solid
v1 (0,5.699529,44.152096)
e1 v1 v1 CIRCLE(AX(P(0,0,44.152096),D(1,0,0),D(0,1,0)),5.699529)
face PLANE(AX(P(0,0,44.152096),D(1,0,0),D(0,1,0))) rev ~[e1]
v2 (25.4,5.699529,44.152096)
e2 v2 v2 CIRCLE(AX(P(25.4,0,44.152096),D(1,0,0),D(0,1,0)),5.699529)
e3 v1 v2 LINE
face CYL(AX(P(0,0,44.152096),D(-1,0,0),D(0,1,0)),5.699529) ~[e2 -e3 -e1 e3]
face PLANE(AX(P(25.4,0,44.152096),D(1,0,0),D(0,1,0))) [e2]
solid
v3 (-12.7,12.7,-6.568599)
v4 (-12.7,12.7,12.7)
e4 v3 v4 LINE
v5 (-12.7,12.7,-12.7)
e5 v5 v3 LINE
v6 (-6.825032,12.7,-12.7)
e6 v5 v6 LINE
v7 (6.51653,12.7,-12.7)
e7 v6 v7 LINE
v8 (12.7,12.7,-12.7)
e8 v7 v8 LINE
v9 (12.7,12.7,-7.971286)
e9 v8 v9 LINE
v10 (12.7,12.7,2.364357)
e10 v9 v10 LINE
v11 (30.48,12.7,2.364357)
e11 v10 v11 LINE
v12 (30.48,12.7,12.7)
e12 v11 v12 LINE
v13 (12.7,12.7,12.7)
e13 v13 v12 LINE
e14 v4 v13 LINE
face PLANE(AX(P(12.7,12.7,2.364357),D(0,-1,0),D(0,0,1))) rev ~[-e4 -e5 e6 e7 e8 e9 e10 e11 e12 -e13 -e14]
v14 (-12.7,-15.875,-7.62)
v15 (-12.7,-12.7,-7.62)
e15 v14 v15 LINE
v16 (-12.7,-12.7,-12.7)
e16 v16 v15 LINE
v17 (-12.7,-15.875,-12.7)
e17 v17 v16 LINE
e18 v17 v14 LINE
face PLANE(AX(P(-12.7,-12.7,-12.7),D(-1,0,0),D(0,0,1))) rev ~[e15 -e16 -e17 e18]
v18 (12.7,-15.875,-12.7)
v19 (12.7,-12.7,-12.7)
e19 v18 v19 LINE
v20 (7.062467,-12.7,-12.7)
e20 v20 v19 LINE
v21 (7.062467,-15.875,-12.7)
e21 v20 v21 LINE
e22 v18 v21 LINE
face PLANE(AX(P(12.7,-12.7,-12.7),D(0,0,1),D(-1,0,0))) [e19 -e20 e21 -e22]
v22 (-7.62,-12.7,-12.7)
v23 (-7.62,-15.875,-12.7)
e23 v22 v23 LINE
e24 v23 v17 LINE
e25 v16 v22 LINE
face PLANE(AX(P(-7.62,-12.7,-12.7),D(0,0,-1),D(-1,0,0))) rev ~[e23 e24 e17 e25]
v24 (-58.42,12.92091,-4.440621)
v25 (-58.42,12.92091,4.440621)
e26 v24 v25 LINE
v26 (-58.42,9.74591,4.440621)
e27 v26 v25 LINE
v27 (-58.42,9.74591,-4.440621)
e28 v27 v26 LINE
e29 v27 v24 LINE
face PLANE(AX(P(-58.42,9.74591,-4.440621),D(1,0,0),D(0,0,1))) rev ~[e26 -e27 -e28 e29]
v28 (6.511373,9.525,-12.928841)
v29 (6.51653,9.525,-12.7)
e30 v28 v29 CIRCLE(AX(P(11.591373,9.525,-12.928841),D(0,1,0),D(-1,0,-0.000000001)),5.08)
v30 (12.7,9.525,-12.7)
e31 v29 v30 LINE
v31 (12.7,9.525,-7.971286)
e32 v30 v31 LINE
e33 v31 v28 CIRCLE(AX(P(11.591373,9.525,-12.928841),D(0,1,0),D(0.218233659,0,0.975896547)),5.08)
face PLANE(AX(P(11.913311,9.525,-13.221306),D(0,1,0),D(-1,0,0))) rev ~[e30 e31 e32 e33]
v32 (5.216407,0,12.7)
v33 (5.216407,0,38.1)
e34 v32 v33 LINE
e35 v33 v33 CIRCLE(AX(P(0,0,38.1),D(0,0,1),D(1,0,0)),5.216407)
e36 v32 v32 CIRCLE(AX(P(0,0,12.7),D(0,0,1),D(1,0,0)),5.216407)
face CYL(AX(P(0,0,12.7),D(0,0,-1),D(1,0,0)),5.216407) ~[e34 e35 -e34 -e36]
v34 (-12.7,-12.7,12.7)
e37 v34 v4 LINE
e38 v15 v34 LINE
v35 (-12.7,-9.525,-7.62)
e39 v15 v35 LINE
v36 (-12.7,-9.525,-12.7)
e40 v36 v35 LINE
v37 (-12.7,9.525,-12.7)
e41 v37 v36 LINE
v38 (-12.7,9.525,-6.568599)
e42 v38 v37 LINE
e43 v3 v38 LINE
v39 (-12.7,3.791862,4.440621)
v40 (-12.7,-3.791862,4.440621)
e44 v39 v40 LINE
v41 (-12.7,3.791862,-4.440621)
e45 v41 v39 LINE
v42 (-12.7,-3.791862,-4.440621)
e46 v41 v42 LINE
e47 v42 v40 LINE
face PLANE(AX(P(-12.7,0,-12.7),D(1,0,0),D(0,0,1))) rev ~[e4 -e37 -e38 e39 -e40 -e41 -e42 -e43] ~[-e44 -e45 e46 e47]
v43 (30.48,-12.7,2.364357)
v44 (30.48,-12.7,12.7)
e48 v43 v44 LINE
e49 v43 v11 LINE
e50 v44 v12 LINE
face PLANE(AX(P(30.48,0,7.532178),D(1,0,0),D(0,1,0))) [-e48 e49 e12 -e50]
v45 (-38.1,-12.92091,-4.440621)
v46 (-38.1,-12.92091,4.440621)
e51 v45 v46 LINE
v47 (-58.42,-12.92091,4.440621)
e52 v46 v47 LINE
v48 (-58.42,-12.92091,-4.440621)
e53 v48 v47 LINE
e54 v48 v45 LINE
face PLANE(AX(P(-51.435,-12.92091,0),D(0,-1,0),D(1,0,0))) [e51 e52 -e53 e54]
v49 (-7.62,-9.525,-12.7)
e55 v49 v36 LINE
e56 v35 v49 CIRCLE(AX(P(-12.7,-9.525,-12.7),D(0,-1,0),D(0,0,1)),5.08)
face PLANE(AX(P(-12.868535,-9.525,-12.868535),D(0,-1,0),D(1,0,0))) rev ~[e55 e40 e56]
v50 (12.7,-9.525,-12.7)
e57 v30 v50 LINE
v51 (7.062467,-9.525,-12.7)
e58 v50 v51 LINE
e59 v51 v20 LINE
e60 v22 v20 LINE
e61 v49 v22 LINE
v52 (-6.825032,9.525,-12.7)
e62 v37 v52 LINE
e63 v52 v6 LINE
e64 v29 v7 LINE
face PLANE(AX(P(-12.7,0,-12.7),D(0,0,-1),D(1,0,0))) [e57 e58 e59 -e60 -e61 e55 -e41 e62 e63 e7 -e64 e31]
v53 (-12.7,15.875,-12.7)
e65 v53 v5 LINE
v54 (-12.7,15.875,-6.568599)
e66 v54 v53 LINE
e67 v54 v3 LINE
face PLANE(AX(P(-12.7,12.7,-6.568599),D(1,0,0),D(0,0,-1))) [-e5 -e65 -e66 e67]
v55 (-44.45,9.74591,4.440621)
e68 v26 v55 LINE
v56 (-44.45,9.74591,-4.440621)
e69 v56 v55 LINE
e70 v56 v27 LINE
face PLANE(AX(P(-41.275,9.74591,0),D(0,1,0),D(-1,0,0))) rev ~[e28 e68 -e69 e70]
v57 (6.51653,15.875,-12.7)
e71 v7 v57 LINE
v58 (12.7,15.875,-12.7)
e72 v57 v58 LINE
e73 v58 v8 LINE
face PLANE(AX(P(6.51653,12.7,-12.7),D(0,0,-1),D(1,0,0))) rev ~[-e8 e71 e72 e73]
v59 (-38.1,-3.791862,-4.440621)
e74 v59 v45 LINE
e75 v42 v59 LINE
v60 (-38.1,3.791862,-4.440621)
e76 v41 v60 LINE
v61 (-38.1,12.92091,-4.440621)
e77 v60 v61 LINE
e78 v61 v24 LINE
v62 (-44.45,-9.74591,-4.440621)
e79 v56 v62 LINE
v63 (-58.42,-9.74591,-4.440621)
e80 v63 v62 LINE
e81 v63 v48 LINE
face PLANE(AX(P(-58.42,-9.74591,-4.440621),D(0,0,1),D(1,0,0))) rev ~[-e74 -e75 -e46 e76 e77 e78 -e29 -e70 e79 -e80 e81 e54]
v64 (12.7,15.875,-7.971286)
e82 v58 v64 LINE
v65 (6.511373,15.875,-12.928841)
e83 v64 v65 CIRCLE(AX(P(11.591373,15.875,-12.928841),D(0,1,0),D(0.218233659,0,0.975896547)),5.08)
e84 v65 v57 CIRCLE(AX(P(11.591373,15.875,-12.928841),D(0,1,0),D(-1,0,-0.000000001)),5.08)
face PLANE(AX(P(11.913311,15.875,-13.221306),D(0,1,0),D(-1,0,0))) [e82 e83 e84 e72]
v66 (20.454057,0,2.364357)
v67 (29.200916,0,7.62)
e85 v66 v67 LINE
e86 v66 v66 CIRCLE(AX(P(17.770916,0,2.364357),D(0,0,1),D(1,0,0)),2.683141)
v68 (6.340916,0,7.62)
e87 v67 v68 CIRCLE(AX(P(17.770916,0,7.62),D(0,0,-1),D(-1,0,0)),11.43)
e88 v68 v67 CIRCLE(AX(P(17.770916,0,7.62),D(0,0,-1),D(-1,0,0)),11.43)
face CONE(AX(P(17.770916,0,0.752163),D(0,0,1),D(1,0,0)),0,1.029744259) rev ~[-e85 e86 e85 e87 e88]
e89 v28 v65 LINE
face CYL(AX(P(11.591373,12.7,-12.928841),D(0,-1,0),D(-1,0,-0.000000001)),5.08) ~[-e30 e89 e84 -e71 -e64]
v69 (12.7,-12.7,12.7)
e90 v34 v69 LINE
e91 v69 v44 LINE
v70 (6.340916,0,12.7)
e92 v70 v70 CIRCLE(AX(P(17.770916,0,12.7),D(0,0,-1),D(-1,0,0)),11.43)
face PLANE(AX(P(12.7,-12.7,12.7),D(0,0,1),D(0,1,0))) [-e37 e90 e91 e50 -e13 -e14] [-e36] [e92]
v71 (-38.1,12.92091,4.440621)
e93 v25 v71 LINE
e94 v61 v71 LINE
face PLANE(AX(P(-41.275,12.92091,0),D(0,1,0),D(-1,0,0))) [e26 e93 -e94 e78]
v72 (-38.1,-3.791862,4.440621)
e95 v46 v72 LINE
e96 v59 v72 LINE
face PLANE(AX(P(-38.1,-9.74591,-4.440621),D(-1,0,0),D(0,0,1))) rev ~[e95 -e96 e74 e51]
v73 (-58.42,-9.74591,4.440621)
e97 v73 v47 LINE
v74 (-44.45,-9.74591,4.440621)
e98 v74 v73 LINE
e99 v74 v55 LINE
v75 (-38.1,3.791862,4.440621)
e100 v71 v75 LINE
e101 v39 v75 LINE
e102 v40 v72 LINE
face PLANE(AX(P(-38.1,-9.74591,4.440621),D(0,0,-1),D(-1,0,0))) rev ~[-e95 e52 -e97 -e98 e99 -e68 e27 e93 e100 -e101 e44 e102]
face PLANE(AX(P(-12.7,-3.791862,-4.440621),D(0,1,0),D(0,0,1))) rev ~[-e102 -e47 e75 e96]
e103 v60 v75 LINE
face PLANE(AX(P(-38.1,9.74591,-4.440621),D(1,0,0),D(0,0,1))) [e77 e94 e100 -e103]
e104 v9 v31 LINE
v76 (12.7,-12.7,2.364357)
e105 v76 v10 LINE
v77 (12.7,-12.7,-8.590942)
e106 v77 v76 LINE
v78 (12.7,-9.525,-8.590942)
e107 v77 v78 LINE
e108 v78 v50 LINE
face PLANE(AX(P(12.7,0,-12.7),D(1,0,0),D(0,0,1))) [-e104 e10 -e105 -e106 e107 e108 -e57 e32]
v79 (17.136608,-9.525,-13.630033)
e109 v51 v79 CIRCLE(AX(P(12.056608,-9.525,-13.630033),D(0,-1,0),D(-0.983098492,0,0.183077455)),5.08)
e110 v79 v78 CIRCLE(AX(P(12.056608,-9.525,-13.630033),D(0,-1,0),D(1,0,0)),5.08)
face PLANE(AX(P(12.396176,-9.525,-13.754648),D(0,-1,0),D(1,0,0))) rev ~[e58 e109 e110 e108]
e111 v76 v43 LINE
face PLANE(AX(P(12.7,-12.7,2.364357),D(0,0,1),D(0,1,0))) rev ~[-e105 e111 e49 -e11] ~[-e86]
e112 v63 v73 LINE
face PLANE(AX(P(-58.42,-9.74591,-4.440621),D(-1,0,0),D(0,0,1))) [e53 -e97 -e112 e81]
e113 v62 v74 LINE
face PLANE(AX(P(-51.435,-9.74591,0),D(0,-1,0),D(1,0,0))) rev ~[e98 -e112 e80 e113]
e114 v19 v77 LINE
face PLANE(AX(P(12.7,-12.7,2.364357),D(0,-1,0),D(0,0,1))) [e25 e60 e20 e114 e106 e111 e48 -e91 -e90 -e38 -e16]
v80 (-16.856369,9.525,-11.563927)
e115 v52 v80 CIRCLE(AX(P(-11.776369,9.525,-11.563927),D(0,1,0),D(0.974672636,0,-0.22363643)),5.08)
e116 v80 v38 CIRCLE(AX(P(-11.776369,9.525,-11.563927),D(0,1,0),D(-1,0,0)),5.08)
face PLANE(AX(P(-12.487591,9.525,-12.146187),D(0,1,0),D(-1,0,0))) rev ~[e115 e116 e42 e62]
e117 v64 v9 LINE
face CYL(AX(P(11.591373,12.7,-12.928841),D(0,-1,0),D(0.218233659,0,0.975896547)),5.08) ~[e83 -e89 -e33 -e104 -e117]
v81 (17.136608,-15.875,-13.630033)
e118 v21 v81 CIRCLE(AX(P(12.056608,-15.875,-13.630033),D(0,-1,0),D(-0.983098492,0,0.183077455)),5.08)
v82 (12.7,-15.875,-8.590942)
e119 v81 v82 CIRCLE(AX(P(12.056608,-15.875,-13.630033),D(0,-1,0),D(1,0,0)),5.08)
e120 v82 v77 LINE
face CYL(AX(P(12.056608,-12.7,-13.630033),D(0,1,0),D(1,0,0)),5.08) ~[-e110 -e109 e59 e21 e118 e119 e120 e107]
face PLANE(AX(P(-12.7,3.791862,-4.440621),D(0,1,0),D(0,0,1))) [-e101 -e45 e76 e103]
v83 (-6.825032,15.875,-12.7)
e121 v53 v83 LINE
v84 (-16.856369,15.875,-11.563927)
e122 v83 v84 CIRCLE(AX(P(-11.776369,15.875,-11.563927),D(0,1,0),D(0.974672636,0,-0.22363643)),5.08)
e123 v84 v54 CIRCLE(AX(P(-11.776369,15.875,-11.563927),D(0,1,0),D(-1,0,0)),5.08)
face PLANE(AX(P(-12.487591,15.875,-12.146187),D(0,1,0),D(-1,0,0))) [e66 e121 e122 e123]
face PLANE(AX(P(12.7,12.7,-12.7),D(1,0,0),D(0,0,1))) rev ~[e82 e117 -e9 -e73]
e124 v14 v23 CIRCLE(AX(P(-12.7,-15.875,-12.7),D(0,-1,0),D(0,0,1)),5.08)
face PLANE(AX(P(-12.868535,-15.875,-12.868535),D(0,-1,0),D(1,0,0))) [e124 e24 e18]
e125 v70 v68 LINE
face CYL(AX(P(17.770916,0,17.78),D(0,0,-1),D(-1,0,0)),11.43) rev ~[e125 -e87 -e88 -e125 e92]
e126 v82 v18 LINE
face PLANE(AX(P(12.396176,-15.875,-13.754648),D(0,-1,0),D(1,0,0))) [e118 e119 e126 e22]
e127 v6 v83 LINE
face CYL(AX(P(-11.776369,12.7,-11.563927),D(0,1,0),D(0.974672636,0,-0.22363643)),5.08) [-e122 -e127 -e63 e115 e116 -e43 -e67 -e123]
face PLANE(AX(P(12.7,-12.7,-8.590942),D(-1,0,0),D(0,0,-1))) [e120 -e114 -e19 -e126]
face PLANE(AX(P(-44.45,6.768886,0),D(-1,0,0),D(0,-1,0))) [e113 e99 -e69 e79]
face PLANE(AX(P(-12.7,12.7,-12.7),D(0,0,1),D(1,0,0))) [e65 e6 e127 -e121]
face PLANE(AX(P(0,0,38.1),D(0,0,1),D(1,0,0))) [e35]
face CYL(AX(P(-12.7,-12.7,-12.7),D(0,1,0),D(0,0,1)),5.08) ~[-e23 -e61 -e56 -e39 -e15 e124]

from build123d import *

# Parameters (mm, degrees)
F0_W      = 25.4
F0_H      = 25.4
F1_DEPTH  = 12.7
F3_DEPTH  = 3.175
F5_DEPTH  = 3.175
F6_R      = 5.2164072596
F7_DEPTH  = 25.4
F8_R      = 5.6995289673
F9_DEPTH  = 25.4
F12_W     = 7.5837243348
F12_H     = 8.8812420145
F13_DEPTH = 25.4
F14_W     = 5.954047665
F14_H     = 8.8812420145
F14_W_2   = 7.5837243348
F15_DEPTH = 6.35
F16_W     = 6.35
F16_H     = 8.8812420145
F16_W_2   = 13.97
F17_DEPTH = 3.175
F18_W     = 13.97
F18_H     = 8.8812420145
F18_W_2   = 6.35
F19_DEPTH = 3.175
F20_W     = 25.4
F20_H     = 10.3356431233
F21_DEPTH = 17.78
F23_D     = 22.86
F23_DEPTH = 5.08
F23_TIP   = 6.8678368755


# Not quite as in the source:
# - the program builds the solid bodies; features that only make, move or delete a surface that nothing else refers to are left out


with BuildPart() as f1:
    # F0 (on Front) → F1 (new body, symmetric)
    with BuildSketch(Plane.XZ):
        Rectangle(F0_W, F0_H)
    extrude(amount=F1_DEPTH, both=True)

    # F2 (on face) → F3 (join, symmetric)
    with BuildSketch(Plane.XZ.offset(12.7)):
        with BuildLine():
            ThreePointArc((-12.7, -7.62), (-16.2921024484, -16.2921024484), (-7.62, -12.7))
            Line((-7.62, -12.7), (-12.7, -12.7))
            Line((-12.7, -12.7), (-12.7, -7.62))
        make_face()
        with BuildLine():
            Line((12.7, -12.7), (7.0624674123, -12.7))
            ThreePointArc((7.0624674123, -12.7), (11.5896136049, -18.6885230146), (17.136607753, -13.6300334707))
            ThreePointArc((17.136607753, -13.6300334707), (15.8694041425, -10.2731027754), (12.7, -8.5909416461))
            Line((12.7, -8.5909416461), (12.7, -12.7))
        make_face()
    extrude(amount=F3_DEPTH, both=True)

    # F4 (on face) → F5 (join, symmetric)
    with BuildSketch(Plane(origin=(0, 12.7, 0), x_dir=(-1, 0, 0), z_dir=(0, 1, 0))):
        with BuildLine():
            ThreePointArc((-12.7, -7.9712862466), (-14.7674220428, -16.8935743083), (-6.5113730115, -12.9288407043))
            ThreePointArc((-6.5113730115, -12.9288407043), (-6.5126624138, -12.8143913027), (-6.5165299664, -12.7))
            Line((-6.5165299664, -12.7), (-12.7, -12.7))
            Line((-12.7, -12.7), (-12.7, -7.9712862466))
        make_face()
        with BuildLine():
            Line((12.7, -12.7), (6.8250320748, -12.7))
            ThreePointArc((6.8250320748, -12.7), (12.3480368398, -16.6116586986), (16.856369065, -11.5639269352))
            ThreePointArc((16.856369065, -11.5639269352), (15.6813943626, -8.314745896), (12.7, -6.568598528))
            Line((12.7, -6.568598528), (12.7, -12.7))
        make_face()
    extrude(amount=F5_DEPTH, both=True)

    # F6 (on face) → F7 (join)
    with BuildSketch(Plane.XY.offset(12.7)):
        Circle(F6_R)
    extrude(amount=F7_DEPTH)

    # F12 (on face) → F13 (join)
    with BuildSketch(Plane(origin=(-12.7, 0, 0), x_dir=(0, -1, 0), z_dir=(-1, 0, 0))):
        Rectangle(F12_W, F12_H)
    extrude(amount=F13_DEPTH)

    # F14 (on face) → F15 (join)
    with BuildSketch(Plane(origin=(-38.1, 0, 0), x_dir=(0, -1, 0), z_dir=(-1, 0, 0))):
        with Locations((-6.7688859999, 0)):
            Rectangle(F14_W, F14_H)
        Rectangle(F14_W_2, F14_H)
        with Locations((6.7688859999, 0)):
            Rectangle(F14_W, F14_H)
    extrude(amount=F15_DEPTH)

    # F16 (on face) → F17 (join)
    with BuildSketch(Plane(origin=(0, 9.7459098324, 0), x_dir=(-1, 0, 0), z_dir=(0, 1, 0))):
        with Locations((41.275, 0)):
            Rectangle(F16_W, F16_H)
        with Locations((51.435, 0)):
            Rectangle(F16_W_2, F16_H)
    extrude(amount=F17_DEPTH)

    # F18 (on face) → F19 (join)
    with BuildSketch(Plane.XZ.offset(9.7459098324)):
        with Locations((-51.435, 0)):
            Rectangle(F18_W, F18_H)
        with Locations((-41.275, 0)):
            Rectangle(F18_W_2, F18_H)
    extrude(amount=F19_DEPTH)

    # F20 (on face) → F21 (join)
    with BuildSketch(Plane.YZ.offset(12.7)):
        with Locations((0, 7.5321784383)):
            Rectangle(F20_W, F20_H)
    extrude(amount=F21_DEPTH)

    # F23
    with Locations(Plane.XY.offset(12.7)):
        with Locations((17.7709162235, 0)):
            Hole(F23_D / 2, depth=F23_DEPTH)
            with Locations((0, 0, -(F23_DEPTH + F23_TIP / 2))):  # 118° drill point
                Cone(0, F23_D / 2, F23_TIP, mode=Mode.SUBTRACT)


with BuildPart() as f9:
    # F8 (on Right) → F9 (new body)
    with BuildSketch(Plane.YZ):
        with Locations((0, 44.1520959139)):
            Circle(F8_R)
    extrude(amount=F9_DEPTH)


solid = Compound([f1.part, f9.part])
